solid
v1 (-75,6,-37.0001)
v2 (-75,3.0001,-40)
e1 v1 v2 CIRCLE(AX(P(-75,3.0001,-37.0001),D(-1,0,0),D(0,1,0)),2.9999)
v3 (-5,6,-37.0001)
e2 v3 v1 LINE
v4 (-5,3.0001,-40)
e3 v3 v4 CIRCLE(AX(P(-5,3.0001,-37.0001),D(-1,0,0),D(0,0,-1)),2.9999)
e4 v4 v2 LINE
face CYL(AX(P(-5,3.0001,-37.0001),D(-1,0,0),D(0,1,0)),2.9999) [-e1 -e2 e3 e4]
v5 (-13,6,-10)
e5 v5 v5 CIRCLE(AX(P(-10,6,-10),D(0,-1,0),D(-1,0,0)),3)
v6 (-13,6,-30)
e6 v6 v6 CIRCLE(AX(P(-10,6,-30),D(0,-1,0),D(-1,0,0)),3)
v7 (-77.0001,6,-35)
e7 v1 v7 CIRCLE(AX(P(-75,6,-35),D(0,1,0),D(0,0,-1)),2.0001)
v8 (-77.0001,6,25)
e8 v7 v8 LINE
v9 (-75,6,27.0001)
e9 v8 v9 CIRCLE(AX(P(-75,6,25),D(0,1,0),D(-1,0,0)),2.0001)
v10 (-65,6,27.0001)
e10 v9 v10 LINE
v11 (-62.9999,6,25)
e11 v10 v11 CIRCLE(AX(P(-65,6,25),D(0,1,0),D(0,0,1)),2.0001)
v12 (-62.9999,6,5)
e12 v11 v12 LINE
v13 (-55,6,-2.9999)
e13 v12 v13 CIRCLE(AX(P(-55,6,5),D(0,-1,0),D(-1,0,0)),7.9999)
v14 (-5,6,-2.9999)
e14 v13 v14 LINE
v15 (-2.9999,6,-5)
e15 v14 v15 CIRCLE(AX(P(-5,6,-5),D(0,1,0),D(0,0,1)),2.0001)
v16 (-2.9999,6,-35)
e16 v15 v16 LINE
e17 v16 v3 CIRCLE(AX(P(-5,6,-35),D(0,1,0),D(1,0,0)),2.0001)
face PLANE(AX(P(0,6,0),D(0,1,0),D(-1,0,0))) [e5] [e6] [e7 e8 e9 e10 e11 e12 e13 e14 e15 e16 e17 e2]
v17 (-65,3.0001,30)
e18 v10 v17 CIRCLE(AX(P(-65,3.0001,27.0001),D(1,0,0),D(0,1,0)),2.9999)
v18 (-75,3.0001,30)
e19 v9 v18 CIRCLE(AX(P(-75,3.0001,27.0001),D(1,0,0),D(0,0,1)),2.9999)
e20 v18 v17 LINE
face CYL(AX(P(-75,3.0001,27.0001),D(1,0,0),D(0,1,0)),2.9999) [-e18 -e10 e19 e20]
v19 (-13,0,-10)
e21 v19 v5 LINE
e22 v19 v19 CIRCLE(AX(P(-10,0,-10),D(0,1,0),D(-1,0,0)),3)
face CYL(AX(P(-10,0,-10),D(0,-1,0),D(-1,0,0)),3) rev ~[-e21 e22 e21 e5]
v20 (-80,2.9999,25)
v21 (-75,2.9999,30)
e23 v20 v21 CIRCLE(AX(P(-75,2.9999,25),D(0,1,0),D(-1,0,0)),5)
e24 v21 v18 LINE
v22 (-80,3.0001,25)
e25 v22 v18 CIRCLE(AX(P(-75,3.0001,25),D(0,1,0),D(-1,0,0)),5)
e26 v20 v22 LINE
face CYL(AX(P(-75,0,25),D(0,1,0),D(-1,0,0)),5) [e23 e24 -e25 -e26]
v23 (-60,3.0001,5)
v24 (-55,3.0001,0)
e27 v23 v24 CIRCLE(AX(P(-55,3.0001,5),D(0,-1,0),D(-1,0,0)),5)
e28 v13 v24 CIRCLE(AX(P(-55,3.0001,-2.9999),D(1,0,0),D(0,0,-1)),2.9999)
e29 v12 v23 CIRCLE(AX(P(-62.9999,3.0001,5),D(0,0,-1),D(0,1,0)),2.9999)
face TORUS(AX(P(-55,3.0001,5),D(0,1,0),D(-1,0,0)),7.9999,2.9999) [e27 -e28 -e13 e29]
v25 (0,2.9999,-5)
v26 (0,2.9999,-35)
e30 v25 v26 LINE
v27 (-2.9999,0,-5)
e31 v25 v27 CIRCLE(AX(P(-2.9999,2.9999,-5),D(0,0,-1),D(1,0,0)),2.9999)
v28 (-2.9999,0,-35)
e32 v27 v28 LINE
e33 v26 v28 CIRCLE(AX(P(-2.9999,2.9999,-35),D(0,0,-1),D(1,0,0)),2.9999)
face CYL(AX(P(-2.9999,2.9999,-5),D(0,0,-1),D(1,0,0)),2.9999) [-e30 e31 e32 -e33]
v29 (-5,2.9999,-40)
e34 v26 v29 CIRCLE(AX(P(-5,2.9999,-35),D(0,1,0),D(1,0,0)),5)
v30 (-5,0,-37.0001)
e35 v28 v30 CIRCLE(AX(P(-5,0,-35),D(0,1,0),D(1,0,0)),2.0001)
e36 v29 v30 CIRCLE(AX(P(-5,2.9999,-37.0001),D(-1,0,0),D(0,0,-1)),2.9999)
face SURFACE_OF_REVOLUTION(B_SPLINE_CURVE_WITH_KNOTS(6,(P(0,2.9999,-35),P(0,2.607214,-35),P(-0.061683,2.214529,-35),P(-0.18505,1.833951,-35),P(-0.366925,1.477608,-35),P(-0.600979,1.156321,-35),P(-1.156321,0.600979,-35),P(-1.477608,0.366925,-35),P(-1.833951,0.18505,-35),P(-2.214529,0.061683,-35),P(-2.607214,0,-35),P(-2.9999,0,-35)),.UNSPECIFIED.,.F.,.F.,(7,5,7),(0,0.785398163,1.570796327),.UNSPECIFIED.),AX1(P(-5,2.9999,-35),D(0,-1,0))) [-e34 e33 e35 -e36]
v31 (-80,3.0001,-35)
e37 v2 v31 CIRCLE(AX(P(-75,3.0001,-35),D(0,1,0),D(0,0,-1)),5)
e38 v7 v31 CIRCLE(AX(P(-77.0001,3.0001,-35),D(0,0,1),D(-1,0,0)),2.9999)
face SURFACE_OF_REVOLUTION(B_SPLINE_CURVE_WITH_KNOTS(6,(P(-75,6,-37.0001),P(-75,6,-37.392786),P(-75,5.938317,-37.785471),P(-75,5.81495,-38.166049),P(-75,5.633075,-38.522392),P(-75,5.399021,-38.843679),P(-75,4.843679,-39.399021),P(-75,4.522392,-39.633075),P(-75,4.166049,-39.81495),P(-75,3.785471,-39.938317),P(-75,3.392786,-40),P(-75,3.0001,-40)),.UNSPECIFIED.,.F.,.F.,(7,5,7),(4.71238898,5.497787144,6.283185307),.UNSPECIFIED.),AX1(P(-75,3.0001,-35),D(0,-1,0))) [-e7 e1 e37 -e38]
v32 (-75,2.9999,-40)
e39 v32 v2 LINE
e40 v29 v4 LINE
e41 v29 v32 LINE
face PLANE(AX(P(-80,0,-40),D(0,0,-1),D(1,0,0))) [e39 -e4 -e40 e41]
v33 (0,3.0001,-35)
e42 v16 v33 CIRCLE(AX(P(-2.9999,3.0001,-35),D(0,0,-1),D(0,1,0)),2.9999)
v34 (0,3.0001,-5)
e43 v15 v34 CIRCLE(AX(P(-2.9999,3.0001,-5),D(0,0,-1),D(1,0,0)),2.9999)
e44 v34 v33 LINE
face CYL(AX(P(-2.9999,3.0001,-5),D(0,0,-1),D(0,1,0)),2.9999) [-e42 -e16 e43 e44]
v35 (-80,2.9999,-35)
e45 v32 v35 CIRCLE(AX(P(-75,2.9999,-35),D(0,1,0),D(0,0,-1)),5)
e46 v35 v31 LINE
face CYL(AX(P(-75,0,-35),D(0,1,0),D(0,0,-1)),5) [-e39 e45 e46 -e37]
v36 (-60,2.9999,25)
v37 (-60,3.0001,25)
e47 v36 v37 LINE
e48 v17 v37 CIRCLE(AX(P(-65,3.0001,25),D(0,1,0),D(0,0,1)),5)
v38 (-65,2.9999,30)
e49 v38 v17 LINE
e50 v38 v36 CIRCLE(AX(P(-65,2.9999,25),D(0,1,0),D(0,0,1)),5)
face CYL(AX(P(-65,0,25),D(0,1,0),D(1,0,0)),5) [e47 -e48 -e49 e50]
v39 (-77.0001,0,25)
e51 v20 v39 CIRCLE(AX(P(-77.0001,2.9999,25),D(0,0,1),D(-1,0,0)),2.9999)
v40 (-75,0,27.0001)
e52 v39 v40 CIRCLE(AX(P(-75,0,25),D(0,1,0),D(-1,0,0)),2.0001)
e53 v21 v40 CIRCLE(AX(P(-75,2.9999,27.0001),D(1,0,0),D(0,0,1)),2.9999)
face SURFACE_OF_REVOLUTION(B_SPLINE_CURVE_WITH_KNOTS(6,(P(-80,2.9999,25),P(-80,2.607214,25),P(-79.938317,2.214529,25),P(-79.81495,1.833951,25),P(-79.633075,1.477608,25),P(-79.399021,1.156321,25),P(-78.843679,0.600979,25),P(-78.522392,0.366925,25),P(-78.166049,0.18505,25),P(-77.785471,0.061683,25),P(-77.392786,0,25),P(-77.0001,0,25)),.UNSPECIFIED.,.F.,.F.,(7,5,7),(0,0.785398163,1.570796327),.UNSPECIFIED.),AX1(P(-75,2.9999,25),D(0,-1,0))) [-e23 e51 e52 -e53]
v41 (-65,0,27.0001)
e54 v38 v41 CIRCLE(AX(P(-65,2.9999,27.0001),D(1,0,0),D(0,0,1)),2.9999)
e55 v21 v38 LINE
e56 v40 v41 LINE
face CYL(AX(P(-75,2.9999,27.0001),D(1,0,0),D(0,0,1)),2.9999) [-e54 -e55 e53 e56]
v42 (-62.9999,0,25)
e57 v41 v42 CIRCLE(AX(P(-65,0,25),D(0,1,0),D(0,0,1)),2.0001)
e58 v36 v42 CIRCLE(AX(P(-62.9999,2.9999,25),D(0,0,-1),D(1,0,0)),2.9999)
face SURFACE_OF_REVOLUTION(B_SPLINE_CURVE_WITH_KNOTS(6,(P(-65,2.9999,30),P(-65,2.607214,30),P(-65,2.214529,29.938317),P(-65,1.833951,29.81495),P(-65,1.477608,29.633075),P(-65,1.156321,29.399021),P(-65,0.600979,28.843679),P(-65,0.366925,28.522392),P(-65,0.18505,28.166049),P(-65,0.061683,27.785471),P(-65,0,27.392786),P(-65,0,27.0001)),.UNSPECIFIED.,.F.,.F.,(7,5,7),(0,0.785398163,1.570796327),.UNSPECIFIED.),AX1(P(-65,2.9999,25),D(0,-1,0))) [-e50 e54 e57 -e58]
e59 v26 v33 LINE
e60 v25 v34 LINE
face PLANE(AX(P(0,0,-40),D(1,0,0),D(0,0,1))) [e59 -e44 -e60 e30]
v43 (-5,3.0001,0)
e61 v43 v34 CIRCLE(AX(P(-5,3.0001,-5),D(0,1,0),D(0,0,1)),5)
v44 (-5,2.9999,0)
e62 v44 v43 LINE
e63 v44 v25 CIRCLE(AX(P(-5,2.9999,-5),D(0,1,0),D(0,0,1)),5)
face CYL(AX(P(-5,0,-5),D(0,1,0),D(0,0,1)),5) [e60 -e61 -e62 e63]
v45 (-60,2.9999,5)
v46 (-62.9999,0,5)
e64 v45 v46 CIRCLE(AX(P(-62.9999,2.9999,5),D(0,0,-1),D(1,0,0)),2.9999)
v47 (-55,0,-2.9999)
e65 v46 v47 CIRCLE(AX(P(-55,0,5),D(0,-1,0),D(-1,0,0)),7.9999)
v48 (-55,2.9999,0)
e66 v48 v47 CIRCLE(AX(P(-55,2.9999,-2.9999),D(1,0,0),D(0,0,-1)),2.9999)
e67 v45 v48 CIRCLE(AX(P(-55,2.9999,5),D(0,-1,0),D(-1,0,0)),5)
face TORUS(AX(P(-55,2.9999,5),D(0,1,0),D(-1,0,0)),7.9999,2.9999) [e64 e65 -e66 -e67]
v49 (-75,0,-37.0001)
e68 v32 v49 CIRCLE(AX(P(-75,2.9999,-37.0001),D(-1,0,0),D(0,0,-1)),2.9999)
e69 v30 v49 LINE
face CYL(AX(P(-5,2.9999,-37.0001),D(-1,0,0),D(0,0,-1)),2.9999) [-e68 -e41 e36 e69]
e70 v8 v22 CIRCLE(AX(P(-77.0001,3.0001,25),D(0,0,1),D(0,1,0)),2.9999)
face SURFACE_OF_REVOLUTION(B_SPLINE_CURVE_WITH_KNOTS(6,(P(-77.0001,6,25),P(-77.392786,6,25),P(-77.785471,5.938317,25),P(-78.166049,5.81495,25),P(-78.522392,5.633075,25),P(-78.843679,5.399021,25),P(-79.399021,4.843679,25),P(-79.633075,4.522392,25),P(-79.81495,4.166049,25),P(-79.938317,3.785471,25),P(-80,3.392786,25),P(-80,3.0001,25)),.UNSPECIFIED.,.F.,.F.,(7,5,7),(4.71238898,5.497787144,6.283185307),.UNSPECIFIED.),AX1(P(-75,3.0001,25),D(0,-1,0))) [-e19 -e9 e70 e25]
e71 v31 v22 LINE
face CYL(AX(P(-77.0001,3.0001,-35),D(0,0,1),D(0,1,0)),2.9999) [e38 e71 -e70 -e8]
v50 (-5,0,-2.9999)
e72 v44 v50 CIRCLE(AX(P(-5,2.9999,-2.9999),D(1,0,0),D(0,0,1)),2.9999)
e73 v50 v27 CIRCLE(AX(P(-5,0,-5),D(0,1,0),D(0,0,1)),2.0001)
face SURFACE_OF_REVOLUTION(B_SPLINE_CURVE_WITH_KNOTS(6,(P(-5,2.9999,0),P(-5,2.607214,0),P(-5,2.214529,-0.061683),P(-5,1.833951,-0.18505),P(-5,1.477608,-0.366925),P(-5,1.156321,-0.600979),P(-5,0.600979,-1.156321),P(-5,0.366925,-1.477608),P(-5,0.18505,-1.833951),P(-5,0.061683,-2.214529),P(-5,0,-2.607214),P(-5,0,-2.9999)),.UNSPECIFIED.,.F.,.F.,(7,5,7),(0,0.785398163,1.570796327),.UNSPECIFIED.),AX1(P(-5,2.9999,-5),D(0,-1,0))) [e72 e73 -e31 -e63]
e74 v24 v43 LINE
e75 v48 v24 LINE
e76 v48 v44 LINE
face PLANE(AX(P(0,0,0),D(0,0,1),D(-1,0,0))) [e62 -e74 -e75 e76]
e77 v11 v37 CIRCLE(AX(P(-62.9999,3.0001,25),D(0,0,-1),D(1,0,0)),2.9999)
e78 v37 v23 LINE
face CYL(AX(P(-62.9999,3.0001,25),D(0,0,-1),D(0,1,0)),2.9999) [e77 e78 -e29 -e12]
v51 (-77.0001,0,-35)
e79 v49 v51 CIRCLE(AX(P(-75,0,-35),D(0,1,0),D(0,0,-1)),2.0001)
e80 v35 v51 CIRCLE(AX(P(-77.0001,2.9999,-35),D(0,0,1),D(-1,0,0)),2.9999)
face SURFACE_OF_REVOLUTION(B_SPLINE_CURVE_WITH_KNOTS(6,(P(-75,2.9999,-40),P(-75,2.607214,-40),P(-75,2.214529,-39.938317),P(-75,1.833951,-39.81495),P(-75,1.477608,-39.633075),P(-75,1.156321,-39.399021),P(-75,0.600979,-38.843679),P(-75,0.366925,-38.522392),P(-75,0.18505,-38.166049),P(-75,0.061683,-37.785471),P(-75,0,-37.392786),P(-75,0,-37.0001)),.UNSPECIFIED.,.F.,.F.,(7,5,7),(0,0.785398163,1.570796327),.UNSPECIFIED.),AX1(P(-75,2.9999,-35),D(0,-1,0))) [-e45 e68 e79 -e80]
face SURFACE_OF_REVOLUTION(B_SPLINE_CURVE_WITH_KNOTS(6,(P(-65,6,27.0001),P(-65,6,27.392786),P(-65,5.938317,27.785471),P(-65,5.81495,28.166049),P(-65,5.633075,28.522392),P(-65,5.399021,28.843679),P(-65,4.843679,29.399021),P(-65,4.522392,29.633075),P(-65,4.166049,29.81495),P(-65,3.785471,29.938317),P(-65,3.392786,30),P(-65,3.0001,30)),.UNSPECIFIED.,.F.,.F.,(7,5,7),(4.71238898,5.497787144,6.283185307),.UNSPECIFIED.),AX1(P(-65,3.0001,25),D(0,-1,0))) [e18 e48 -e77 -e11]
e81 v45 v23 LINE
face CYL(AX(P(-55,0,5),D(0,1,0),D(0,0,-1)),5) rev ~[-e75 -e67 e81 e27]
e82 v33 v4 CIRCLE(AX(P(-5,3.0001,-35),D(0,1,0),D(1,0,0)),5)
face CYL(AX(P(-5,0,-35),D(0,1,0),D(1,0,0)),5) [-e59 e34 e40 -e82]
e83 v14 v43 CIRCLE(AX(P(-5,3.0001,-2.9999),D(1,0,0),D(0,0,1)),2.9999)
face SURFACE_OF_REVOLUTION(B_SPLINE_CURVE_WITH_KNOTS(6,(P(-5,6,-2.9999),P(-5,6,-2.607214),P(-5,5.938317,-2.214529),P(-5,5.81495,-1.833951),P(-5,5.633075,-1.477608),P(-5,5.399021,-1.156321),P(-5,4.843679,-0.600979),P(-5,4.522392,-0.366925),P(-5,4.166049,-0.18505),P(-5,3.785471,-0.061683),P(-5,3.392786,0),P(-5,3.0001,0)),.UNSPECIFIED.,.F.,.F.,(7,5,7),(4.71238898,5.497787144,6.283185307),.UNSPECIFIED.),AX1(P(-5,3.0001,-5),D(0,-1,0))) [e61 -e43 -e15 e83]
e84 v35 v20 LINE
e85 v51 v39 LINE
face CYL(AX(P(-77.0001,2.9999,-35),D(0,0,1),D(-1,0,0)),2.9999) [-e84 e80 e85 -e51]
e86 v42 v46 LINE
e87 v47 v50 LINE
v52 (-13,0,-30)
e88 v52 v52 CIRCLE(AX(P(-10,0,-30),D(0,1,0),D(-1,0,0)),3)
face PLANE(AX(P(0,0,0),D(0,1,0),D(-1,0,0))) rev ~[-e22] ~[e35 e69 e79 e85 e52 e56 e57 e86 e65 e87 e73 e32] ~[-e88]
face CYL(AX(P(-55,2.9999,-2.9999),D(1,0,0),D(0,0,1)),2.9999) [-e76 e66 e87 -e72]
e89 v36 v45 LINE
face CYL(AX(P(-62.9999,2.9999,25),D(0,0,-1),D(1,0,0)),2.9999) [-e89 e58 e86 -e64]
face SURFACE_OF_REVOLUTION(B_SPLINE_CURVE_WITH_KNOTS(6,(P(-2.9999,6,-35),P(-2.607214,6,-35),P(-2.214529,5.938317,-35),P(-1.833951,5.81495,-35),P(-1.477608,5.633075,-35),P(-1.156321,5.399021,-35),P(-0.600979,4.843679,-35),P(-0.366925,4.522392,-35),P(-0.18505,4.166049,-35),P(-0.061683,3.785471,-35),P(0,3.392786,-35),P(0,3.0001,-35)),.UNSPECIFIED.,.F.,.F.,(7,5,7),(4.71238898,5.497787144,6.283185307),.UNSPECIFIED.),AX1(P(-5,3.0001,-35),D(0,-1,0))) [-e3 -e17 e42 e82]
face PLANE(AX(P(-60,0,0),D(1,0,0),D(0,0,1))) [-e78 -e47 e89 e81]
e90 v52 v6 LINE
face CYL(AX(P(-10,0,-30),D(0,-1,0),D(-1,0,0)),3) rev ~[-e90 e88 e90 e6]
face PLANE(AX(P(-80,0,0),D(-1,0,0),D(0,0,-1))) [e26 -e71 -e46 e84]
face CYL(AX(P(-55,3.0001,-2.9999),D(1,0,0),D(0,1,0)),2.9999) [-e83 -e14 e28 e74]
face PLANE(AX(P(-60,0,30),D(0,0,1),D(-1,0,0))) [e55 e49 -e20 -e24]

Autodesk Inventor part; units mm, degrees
ref_plane "YZ Plane" through (0, 0, 0) normal (1, 0, 0) x (0, 1, 0)
ref_plane "XZ Plane" through (0, 0, 0) normal (0, 1, 0) x (-1, 0, 0)
ref_plane "XY Plane" through (0, 0, 0) normal (0, 0, 1) x (1, 0, 0)
sketch "Sketch1" plane through (0, 0, 0) normal (0, 1, 0) x (-1, 0, 0)
  line L0 (0, 0) -> (80, 0)
  line L1 (80, 0) -> (80, -40)
  line L2 (80, -40) -> (0, -40)
  line L3 (0, -40) -> (0, 0)
  line L4 (0, 0) -> (10, 0)
  line L5 (10, 0) -> (10, -10)
  line L6 (10, -10) -> (10, -30)
  circle A0 centre (10, -10) radius 3
  circle A1 centre (10, -30) radius 3
  line L7 (80, 0) -> (60, 0)
  line L8 (60, 0) -> (60, 30)
  line L9 (60, 30) -> (80, 30)
  line L10 (80, 30) -> (80, 0)
  dimension "d0" = 80
  dimension "d1" = 40
  dimension "d2" = 10
  dimension "d3" = 10
  dimension "d4" = 20
  dimension "d5" = 6
  dimension "d6" = 6
  dimension "d28" = 20
  dimension "d29" = 30
extrude "Extrusion1" add sketch "Sketch1" along normal blind 6
fillet "Fillet5" radius 5 6 edges at (-60, 3, 0) (-60, 3, 30) (-80, 3, 30) (0, 3, 0) (0, 3, -40) (-80, 3, -40)
fillet "Fillet6" radius 3 24 edges at (-1.4645, 6, -1.4645) (0, 6, -20) (-1.4645, 6, -38.5355) (-40, 6, -40) (-78.5355, 6, -38.5355) (-80, 6, -5) (-78.5355, 6, 28.5355) (-70, 6, 30) (-61.4645, 6, 28.5355) (-60, 6, 15) (-58.5355, 6, 1.4645) (-30, 6, 0) (-1.4645, 0, -1.4645) (0, 0, -20) (-1.4645, 0, -38.5355) (-40, 0, -40) (-78.5355, 0, -38.5355) (-80, 0, -5) (-78.5355, 0, 28.5355) (-70, 0, 30) (-61.4645, 0, 28.5355) (-60, 0, 15) (-58.5355, 0, 1.4645) (-30, 0, 0)
properties part number "CableHook"
